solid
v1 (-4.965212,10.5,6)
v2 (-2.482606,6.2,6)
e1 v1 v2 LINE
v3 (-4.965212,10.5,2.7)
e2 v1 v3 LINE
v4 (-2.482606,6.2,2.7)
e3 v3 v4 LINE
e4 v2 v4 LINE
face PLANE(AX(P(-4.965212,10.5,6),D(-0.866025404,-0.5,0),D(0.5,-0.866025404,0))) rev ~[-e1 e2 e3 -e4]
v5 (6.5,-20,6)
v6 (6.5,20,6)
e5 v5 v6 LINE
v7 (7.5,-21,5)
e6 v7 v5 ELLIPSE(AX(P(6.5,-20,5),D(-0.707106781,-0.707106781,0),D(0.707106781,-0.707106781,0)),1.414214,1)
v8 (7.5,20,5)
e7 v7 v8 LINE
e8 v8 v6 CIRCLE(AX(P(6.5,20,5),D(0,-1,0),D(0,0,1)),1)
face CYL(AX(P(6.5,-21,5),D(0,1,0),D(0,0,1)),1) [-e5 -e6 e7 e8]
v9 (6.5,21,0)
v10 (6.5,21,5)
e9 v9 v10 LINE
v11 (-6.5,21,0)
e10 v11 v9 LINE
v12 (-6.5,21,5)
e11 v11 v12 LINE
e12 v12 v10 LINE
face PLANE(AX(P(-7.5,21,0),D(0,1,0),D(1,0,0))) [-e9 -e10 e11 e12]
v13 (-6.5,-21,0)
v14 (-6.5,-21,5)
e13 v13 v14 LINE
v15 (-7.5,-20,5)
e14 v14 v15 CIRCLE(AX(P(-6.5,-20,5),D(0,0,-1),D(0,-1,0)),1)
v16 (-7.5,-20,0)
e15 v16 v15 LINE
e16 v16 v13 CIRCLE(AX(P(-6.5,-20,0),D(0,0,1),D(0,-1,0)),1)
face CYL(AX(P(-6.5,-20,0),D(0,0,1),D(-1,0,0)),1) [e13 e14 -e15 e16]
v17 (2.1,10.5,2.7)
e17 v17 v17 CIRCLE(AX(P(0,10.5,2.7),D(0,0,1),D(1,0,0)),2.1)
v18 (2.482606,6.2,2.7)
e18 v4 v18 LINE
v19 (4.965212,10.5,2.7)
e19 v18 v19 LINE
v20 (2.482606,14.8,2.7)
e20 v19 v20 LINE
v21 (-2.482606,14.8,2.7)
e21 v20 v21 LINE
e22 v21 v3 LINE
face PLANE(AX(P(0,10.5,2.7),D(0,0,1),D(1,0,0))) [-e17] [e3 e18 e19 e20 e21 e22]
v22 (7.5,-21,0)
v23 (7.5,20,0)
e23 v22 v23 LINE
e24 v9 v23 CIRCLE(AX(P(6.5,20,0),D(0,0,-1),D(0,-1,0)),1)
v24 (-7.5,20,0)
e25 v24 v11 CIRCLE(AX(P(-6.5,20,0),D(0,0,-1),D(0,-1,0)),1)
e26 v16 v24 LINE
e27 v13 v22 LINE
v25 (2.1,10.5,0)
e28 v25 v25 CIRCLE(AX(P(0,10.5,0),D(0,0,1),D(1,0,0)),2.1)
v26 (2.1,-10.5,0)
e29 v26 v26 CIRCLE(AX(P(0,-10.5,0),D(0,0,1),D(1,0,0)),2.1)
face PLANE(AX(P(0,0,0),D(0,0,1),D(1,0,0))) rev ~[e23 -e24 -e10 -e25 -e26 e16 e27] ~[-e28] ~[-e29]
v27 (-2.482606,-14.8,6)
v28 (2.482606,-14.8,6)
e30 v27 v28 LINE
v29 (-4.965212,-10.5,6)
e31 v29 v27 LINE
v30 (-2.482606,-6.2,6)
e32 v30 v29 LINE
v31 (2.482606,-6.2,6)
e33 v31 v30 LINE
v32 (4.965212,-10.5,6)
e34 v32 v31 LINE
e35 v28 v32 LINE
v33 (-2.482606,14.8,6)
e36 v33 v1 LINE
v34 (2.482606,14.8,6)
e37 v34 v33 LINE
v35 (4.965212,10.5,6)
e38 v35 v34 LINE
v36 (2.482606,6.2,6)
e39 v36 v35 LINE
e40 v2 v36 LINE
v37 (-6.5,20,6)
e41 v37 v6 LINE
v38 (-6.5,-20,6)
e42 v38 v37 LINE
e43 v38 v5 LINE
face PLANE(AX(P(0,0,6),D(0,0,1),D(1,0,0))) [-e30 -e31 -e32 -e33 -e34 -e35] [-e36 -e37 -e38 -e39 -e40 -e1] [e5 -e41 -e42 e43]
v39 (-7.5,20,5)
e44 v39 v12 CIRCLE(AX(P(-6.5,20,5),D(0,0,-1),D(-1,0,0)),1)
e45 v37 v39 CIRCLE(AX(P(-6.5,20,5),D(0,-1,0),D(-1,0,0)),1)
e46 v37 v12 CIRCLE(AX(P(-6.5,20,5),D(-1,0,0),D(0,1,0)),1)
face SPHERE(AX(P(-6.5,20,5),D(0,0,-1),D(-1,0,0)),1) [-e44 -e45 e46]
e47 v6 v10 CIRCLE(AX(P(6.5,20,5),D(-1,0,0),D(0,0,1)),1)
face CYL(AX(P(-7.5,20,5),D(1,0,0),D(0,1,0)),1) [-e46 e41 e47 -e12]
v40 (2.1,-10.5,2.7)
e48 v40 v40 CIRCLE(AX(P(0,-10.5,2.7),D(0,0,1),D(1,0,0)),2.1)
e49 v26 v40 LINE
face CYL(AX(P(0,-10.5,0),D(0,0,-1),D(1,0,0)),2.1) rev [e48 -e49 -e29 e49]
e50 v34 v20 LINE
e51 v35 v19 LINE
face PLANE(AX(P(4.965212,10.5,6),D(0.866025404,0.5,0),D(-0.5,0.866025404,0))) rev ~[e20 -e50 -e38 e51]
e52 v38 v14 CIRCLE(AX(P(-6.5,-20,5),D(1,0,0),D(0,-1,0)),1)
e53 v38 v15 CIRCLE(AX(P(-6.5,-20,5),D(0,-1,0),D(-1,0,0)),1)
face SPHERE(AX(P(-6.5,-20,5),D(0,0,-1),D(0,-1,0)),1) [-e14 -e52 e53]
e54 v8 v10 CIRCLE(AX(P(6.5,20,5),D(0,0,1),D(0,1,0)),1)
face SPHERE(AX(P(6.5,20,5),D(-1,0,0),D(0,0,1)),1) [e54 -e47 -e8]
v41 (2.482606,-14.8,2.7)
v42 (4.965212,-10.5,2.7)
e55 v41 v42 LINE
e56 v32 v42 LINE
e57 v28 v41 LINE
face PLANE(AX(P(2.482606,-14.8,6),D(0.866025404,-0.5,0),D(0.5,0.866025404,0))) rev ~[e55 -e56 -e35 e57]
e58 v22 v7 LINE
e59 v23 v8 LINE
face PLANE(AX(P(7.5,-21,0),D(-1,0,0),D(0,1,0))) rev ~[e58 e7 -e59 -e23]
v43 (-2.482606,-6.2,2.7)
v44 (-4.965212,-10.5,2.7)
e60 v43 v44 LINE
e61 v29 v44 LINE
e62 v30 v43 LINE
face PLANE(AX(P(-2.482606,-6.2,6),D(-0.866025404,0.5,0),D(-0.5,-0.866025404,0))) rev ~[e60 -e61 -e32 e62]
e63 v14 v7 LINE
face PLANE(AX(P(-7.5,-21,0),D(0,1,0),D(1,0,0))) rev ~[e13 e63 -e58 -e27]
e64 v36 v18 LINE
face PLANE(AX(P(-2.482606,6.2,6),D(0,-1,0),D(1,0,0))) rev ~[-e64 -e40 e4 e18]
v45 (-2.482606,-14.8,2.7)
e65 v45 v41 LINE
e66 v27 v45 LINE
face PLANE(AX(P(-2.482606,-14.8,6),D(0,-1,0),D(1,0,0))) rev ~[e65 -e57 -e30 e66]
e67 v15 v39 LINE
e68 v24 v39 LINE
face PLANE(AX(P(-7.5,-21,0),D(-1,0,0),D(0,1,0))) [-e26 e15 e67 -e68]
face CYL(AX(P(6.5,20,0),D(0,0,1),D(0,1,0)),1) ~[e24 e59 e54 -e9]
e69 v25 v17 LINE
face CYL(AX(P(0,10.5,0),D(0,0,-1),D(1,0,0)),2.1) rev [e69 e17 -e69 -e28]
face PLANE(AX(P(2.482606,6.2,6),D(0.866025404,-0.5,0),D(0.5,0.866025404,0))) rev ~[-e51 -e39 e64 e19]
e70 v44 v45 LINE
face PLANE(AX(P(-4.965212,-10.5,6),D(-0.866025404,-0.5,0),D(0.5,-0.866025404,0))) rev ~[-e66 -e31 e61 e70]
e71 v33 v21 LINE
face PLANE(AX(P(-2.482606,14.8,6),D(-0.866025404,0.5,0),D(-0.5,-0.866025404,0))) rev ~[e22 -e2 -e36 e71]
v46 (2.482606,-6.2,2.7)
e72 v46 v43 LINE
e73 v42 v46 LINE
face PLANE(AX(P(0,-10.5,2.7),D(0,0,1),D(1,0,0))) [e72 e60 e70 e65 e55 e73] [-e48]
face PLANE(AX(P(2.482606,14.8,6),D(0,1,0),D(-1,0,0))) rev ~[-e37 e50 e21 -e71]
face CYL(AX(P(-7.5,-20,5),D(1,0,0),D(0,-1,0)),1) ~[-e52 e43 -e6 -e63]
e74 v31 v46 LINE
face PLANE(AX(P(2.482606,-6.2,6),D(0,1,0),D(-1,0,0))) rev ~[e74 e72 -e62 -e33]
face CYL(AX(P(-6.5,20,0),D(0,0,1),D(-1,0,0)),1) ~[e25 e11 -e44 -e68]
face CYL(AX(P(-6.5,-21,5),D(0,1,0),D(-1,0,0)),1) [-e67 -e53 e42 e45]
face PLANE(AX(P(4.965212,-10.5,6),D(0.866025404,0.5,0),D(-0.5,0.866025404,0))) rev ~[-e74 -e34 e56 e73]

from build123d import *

# Parameters (mm, degrees)
F0_W     = 15
F0_H     = 42
F0_R     = 2.1
F1_DEPTH = 6
F2_DEPTH = 6.001
F3_R     = 2.1
F4_DEPTH = 3.3
F5_R     = 1


# Not quite as in the source:
# - a feature names something its author has since deleted; it is built from what else it names


with BuildPart() as f1:
    # F0 (on Top) → F1 (new body)
    with BuildSketch(Plane.XY):
        Rectangle(F0_W, F0_H)
        with Locations((0, -10.5)):
            Circle(F0_R, mode=Mode.SUBTRACT)
        with Locations((0, 10.5)):
            Circle(F0_R, mode=Mode.SUBTRACT)
        with Locations((0, -10.5)):
            Circle(F0_R)
        with Locations((0, 10.5)):
            Circle(F0_R)
    extrude(amount=F1_DEPTH)

    # F0 (on Top) → F2 (cut, through all)
    with BuildSketch(Plane.XY):
        with Locations((0, 10.5)):
            Circle(F0_R)
        with Locations((0, -10.5)):
            Circle(F0_R)
    extrude(amount=F2_DEPTH, mode=Mode.SUBTRACT)

    # F3 (on face) → F4 (cut)
    with BuildSketch(Plane.XY.offset(6)):
        Polygon((4.965212315, -10.5), (2.4826061575, -6.2), (-2.4826061575, -6.2), (-4.965212315, -10.5), (-2.4826061575, -14.8), (2.4826061575, -14.8), align=None)
        with Locations((0, -10.5)):
            Circle(F3_R, mode=Mode.SUBTRACT)
        Polygon((4.965212315, 10.5), (2.4826061575, 14.8), (-2.4826061575, 14.8), (-4.965212315, 10.5), (-2.4826061575, 6.2), (2.4826061575, 6.2), align=None)
        with Locations((0, 10.5)):
            Circle(F3_R, mode=Mode.SUBTRACT)
    extrude(amount=-F4_DEPTH, mode=Mode.SUBTRACT)

    # F5
    f5_edges = [f1.edges().sort_by_distance(p)[0] for p in [
        (-7.5, 21, 3),
        (-7.5, -21, 3),
        (0, -21, 6),
        (-7.5, 0, 6),
        (0, 21, 6),
        (7.5, 0, 6),
        (7.5, 21, 3),
    ]]
    fillet(f5_edges, radius=F5_R)


solid = f1.part
